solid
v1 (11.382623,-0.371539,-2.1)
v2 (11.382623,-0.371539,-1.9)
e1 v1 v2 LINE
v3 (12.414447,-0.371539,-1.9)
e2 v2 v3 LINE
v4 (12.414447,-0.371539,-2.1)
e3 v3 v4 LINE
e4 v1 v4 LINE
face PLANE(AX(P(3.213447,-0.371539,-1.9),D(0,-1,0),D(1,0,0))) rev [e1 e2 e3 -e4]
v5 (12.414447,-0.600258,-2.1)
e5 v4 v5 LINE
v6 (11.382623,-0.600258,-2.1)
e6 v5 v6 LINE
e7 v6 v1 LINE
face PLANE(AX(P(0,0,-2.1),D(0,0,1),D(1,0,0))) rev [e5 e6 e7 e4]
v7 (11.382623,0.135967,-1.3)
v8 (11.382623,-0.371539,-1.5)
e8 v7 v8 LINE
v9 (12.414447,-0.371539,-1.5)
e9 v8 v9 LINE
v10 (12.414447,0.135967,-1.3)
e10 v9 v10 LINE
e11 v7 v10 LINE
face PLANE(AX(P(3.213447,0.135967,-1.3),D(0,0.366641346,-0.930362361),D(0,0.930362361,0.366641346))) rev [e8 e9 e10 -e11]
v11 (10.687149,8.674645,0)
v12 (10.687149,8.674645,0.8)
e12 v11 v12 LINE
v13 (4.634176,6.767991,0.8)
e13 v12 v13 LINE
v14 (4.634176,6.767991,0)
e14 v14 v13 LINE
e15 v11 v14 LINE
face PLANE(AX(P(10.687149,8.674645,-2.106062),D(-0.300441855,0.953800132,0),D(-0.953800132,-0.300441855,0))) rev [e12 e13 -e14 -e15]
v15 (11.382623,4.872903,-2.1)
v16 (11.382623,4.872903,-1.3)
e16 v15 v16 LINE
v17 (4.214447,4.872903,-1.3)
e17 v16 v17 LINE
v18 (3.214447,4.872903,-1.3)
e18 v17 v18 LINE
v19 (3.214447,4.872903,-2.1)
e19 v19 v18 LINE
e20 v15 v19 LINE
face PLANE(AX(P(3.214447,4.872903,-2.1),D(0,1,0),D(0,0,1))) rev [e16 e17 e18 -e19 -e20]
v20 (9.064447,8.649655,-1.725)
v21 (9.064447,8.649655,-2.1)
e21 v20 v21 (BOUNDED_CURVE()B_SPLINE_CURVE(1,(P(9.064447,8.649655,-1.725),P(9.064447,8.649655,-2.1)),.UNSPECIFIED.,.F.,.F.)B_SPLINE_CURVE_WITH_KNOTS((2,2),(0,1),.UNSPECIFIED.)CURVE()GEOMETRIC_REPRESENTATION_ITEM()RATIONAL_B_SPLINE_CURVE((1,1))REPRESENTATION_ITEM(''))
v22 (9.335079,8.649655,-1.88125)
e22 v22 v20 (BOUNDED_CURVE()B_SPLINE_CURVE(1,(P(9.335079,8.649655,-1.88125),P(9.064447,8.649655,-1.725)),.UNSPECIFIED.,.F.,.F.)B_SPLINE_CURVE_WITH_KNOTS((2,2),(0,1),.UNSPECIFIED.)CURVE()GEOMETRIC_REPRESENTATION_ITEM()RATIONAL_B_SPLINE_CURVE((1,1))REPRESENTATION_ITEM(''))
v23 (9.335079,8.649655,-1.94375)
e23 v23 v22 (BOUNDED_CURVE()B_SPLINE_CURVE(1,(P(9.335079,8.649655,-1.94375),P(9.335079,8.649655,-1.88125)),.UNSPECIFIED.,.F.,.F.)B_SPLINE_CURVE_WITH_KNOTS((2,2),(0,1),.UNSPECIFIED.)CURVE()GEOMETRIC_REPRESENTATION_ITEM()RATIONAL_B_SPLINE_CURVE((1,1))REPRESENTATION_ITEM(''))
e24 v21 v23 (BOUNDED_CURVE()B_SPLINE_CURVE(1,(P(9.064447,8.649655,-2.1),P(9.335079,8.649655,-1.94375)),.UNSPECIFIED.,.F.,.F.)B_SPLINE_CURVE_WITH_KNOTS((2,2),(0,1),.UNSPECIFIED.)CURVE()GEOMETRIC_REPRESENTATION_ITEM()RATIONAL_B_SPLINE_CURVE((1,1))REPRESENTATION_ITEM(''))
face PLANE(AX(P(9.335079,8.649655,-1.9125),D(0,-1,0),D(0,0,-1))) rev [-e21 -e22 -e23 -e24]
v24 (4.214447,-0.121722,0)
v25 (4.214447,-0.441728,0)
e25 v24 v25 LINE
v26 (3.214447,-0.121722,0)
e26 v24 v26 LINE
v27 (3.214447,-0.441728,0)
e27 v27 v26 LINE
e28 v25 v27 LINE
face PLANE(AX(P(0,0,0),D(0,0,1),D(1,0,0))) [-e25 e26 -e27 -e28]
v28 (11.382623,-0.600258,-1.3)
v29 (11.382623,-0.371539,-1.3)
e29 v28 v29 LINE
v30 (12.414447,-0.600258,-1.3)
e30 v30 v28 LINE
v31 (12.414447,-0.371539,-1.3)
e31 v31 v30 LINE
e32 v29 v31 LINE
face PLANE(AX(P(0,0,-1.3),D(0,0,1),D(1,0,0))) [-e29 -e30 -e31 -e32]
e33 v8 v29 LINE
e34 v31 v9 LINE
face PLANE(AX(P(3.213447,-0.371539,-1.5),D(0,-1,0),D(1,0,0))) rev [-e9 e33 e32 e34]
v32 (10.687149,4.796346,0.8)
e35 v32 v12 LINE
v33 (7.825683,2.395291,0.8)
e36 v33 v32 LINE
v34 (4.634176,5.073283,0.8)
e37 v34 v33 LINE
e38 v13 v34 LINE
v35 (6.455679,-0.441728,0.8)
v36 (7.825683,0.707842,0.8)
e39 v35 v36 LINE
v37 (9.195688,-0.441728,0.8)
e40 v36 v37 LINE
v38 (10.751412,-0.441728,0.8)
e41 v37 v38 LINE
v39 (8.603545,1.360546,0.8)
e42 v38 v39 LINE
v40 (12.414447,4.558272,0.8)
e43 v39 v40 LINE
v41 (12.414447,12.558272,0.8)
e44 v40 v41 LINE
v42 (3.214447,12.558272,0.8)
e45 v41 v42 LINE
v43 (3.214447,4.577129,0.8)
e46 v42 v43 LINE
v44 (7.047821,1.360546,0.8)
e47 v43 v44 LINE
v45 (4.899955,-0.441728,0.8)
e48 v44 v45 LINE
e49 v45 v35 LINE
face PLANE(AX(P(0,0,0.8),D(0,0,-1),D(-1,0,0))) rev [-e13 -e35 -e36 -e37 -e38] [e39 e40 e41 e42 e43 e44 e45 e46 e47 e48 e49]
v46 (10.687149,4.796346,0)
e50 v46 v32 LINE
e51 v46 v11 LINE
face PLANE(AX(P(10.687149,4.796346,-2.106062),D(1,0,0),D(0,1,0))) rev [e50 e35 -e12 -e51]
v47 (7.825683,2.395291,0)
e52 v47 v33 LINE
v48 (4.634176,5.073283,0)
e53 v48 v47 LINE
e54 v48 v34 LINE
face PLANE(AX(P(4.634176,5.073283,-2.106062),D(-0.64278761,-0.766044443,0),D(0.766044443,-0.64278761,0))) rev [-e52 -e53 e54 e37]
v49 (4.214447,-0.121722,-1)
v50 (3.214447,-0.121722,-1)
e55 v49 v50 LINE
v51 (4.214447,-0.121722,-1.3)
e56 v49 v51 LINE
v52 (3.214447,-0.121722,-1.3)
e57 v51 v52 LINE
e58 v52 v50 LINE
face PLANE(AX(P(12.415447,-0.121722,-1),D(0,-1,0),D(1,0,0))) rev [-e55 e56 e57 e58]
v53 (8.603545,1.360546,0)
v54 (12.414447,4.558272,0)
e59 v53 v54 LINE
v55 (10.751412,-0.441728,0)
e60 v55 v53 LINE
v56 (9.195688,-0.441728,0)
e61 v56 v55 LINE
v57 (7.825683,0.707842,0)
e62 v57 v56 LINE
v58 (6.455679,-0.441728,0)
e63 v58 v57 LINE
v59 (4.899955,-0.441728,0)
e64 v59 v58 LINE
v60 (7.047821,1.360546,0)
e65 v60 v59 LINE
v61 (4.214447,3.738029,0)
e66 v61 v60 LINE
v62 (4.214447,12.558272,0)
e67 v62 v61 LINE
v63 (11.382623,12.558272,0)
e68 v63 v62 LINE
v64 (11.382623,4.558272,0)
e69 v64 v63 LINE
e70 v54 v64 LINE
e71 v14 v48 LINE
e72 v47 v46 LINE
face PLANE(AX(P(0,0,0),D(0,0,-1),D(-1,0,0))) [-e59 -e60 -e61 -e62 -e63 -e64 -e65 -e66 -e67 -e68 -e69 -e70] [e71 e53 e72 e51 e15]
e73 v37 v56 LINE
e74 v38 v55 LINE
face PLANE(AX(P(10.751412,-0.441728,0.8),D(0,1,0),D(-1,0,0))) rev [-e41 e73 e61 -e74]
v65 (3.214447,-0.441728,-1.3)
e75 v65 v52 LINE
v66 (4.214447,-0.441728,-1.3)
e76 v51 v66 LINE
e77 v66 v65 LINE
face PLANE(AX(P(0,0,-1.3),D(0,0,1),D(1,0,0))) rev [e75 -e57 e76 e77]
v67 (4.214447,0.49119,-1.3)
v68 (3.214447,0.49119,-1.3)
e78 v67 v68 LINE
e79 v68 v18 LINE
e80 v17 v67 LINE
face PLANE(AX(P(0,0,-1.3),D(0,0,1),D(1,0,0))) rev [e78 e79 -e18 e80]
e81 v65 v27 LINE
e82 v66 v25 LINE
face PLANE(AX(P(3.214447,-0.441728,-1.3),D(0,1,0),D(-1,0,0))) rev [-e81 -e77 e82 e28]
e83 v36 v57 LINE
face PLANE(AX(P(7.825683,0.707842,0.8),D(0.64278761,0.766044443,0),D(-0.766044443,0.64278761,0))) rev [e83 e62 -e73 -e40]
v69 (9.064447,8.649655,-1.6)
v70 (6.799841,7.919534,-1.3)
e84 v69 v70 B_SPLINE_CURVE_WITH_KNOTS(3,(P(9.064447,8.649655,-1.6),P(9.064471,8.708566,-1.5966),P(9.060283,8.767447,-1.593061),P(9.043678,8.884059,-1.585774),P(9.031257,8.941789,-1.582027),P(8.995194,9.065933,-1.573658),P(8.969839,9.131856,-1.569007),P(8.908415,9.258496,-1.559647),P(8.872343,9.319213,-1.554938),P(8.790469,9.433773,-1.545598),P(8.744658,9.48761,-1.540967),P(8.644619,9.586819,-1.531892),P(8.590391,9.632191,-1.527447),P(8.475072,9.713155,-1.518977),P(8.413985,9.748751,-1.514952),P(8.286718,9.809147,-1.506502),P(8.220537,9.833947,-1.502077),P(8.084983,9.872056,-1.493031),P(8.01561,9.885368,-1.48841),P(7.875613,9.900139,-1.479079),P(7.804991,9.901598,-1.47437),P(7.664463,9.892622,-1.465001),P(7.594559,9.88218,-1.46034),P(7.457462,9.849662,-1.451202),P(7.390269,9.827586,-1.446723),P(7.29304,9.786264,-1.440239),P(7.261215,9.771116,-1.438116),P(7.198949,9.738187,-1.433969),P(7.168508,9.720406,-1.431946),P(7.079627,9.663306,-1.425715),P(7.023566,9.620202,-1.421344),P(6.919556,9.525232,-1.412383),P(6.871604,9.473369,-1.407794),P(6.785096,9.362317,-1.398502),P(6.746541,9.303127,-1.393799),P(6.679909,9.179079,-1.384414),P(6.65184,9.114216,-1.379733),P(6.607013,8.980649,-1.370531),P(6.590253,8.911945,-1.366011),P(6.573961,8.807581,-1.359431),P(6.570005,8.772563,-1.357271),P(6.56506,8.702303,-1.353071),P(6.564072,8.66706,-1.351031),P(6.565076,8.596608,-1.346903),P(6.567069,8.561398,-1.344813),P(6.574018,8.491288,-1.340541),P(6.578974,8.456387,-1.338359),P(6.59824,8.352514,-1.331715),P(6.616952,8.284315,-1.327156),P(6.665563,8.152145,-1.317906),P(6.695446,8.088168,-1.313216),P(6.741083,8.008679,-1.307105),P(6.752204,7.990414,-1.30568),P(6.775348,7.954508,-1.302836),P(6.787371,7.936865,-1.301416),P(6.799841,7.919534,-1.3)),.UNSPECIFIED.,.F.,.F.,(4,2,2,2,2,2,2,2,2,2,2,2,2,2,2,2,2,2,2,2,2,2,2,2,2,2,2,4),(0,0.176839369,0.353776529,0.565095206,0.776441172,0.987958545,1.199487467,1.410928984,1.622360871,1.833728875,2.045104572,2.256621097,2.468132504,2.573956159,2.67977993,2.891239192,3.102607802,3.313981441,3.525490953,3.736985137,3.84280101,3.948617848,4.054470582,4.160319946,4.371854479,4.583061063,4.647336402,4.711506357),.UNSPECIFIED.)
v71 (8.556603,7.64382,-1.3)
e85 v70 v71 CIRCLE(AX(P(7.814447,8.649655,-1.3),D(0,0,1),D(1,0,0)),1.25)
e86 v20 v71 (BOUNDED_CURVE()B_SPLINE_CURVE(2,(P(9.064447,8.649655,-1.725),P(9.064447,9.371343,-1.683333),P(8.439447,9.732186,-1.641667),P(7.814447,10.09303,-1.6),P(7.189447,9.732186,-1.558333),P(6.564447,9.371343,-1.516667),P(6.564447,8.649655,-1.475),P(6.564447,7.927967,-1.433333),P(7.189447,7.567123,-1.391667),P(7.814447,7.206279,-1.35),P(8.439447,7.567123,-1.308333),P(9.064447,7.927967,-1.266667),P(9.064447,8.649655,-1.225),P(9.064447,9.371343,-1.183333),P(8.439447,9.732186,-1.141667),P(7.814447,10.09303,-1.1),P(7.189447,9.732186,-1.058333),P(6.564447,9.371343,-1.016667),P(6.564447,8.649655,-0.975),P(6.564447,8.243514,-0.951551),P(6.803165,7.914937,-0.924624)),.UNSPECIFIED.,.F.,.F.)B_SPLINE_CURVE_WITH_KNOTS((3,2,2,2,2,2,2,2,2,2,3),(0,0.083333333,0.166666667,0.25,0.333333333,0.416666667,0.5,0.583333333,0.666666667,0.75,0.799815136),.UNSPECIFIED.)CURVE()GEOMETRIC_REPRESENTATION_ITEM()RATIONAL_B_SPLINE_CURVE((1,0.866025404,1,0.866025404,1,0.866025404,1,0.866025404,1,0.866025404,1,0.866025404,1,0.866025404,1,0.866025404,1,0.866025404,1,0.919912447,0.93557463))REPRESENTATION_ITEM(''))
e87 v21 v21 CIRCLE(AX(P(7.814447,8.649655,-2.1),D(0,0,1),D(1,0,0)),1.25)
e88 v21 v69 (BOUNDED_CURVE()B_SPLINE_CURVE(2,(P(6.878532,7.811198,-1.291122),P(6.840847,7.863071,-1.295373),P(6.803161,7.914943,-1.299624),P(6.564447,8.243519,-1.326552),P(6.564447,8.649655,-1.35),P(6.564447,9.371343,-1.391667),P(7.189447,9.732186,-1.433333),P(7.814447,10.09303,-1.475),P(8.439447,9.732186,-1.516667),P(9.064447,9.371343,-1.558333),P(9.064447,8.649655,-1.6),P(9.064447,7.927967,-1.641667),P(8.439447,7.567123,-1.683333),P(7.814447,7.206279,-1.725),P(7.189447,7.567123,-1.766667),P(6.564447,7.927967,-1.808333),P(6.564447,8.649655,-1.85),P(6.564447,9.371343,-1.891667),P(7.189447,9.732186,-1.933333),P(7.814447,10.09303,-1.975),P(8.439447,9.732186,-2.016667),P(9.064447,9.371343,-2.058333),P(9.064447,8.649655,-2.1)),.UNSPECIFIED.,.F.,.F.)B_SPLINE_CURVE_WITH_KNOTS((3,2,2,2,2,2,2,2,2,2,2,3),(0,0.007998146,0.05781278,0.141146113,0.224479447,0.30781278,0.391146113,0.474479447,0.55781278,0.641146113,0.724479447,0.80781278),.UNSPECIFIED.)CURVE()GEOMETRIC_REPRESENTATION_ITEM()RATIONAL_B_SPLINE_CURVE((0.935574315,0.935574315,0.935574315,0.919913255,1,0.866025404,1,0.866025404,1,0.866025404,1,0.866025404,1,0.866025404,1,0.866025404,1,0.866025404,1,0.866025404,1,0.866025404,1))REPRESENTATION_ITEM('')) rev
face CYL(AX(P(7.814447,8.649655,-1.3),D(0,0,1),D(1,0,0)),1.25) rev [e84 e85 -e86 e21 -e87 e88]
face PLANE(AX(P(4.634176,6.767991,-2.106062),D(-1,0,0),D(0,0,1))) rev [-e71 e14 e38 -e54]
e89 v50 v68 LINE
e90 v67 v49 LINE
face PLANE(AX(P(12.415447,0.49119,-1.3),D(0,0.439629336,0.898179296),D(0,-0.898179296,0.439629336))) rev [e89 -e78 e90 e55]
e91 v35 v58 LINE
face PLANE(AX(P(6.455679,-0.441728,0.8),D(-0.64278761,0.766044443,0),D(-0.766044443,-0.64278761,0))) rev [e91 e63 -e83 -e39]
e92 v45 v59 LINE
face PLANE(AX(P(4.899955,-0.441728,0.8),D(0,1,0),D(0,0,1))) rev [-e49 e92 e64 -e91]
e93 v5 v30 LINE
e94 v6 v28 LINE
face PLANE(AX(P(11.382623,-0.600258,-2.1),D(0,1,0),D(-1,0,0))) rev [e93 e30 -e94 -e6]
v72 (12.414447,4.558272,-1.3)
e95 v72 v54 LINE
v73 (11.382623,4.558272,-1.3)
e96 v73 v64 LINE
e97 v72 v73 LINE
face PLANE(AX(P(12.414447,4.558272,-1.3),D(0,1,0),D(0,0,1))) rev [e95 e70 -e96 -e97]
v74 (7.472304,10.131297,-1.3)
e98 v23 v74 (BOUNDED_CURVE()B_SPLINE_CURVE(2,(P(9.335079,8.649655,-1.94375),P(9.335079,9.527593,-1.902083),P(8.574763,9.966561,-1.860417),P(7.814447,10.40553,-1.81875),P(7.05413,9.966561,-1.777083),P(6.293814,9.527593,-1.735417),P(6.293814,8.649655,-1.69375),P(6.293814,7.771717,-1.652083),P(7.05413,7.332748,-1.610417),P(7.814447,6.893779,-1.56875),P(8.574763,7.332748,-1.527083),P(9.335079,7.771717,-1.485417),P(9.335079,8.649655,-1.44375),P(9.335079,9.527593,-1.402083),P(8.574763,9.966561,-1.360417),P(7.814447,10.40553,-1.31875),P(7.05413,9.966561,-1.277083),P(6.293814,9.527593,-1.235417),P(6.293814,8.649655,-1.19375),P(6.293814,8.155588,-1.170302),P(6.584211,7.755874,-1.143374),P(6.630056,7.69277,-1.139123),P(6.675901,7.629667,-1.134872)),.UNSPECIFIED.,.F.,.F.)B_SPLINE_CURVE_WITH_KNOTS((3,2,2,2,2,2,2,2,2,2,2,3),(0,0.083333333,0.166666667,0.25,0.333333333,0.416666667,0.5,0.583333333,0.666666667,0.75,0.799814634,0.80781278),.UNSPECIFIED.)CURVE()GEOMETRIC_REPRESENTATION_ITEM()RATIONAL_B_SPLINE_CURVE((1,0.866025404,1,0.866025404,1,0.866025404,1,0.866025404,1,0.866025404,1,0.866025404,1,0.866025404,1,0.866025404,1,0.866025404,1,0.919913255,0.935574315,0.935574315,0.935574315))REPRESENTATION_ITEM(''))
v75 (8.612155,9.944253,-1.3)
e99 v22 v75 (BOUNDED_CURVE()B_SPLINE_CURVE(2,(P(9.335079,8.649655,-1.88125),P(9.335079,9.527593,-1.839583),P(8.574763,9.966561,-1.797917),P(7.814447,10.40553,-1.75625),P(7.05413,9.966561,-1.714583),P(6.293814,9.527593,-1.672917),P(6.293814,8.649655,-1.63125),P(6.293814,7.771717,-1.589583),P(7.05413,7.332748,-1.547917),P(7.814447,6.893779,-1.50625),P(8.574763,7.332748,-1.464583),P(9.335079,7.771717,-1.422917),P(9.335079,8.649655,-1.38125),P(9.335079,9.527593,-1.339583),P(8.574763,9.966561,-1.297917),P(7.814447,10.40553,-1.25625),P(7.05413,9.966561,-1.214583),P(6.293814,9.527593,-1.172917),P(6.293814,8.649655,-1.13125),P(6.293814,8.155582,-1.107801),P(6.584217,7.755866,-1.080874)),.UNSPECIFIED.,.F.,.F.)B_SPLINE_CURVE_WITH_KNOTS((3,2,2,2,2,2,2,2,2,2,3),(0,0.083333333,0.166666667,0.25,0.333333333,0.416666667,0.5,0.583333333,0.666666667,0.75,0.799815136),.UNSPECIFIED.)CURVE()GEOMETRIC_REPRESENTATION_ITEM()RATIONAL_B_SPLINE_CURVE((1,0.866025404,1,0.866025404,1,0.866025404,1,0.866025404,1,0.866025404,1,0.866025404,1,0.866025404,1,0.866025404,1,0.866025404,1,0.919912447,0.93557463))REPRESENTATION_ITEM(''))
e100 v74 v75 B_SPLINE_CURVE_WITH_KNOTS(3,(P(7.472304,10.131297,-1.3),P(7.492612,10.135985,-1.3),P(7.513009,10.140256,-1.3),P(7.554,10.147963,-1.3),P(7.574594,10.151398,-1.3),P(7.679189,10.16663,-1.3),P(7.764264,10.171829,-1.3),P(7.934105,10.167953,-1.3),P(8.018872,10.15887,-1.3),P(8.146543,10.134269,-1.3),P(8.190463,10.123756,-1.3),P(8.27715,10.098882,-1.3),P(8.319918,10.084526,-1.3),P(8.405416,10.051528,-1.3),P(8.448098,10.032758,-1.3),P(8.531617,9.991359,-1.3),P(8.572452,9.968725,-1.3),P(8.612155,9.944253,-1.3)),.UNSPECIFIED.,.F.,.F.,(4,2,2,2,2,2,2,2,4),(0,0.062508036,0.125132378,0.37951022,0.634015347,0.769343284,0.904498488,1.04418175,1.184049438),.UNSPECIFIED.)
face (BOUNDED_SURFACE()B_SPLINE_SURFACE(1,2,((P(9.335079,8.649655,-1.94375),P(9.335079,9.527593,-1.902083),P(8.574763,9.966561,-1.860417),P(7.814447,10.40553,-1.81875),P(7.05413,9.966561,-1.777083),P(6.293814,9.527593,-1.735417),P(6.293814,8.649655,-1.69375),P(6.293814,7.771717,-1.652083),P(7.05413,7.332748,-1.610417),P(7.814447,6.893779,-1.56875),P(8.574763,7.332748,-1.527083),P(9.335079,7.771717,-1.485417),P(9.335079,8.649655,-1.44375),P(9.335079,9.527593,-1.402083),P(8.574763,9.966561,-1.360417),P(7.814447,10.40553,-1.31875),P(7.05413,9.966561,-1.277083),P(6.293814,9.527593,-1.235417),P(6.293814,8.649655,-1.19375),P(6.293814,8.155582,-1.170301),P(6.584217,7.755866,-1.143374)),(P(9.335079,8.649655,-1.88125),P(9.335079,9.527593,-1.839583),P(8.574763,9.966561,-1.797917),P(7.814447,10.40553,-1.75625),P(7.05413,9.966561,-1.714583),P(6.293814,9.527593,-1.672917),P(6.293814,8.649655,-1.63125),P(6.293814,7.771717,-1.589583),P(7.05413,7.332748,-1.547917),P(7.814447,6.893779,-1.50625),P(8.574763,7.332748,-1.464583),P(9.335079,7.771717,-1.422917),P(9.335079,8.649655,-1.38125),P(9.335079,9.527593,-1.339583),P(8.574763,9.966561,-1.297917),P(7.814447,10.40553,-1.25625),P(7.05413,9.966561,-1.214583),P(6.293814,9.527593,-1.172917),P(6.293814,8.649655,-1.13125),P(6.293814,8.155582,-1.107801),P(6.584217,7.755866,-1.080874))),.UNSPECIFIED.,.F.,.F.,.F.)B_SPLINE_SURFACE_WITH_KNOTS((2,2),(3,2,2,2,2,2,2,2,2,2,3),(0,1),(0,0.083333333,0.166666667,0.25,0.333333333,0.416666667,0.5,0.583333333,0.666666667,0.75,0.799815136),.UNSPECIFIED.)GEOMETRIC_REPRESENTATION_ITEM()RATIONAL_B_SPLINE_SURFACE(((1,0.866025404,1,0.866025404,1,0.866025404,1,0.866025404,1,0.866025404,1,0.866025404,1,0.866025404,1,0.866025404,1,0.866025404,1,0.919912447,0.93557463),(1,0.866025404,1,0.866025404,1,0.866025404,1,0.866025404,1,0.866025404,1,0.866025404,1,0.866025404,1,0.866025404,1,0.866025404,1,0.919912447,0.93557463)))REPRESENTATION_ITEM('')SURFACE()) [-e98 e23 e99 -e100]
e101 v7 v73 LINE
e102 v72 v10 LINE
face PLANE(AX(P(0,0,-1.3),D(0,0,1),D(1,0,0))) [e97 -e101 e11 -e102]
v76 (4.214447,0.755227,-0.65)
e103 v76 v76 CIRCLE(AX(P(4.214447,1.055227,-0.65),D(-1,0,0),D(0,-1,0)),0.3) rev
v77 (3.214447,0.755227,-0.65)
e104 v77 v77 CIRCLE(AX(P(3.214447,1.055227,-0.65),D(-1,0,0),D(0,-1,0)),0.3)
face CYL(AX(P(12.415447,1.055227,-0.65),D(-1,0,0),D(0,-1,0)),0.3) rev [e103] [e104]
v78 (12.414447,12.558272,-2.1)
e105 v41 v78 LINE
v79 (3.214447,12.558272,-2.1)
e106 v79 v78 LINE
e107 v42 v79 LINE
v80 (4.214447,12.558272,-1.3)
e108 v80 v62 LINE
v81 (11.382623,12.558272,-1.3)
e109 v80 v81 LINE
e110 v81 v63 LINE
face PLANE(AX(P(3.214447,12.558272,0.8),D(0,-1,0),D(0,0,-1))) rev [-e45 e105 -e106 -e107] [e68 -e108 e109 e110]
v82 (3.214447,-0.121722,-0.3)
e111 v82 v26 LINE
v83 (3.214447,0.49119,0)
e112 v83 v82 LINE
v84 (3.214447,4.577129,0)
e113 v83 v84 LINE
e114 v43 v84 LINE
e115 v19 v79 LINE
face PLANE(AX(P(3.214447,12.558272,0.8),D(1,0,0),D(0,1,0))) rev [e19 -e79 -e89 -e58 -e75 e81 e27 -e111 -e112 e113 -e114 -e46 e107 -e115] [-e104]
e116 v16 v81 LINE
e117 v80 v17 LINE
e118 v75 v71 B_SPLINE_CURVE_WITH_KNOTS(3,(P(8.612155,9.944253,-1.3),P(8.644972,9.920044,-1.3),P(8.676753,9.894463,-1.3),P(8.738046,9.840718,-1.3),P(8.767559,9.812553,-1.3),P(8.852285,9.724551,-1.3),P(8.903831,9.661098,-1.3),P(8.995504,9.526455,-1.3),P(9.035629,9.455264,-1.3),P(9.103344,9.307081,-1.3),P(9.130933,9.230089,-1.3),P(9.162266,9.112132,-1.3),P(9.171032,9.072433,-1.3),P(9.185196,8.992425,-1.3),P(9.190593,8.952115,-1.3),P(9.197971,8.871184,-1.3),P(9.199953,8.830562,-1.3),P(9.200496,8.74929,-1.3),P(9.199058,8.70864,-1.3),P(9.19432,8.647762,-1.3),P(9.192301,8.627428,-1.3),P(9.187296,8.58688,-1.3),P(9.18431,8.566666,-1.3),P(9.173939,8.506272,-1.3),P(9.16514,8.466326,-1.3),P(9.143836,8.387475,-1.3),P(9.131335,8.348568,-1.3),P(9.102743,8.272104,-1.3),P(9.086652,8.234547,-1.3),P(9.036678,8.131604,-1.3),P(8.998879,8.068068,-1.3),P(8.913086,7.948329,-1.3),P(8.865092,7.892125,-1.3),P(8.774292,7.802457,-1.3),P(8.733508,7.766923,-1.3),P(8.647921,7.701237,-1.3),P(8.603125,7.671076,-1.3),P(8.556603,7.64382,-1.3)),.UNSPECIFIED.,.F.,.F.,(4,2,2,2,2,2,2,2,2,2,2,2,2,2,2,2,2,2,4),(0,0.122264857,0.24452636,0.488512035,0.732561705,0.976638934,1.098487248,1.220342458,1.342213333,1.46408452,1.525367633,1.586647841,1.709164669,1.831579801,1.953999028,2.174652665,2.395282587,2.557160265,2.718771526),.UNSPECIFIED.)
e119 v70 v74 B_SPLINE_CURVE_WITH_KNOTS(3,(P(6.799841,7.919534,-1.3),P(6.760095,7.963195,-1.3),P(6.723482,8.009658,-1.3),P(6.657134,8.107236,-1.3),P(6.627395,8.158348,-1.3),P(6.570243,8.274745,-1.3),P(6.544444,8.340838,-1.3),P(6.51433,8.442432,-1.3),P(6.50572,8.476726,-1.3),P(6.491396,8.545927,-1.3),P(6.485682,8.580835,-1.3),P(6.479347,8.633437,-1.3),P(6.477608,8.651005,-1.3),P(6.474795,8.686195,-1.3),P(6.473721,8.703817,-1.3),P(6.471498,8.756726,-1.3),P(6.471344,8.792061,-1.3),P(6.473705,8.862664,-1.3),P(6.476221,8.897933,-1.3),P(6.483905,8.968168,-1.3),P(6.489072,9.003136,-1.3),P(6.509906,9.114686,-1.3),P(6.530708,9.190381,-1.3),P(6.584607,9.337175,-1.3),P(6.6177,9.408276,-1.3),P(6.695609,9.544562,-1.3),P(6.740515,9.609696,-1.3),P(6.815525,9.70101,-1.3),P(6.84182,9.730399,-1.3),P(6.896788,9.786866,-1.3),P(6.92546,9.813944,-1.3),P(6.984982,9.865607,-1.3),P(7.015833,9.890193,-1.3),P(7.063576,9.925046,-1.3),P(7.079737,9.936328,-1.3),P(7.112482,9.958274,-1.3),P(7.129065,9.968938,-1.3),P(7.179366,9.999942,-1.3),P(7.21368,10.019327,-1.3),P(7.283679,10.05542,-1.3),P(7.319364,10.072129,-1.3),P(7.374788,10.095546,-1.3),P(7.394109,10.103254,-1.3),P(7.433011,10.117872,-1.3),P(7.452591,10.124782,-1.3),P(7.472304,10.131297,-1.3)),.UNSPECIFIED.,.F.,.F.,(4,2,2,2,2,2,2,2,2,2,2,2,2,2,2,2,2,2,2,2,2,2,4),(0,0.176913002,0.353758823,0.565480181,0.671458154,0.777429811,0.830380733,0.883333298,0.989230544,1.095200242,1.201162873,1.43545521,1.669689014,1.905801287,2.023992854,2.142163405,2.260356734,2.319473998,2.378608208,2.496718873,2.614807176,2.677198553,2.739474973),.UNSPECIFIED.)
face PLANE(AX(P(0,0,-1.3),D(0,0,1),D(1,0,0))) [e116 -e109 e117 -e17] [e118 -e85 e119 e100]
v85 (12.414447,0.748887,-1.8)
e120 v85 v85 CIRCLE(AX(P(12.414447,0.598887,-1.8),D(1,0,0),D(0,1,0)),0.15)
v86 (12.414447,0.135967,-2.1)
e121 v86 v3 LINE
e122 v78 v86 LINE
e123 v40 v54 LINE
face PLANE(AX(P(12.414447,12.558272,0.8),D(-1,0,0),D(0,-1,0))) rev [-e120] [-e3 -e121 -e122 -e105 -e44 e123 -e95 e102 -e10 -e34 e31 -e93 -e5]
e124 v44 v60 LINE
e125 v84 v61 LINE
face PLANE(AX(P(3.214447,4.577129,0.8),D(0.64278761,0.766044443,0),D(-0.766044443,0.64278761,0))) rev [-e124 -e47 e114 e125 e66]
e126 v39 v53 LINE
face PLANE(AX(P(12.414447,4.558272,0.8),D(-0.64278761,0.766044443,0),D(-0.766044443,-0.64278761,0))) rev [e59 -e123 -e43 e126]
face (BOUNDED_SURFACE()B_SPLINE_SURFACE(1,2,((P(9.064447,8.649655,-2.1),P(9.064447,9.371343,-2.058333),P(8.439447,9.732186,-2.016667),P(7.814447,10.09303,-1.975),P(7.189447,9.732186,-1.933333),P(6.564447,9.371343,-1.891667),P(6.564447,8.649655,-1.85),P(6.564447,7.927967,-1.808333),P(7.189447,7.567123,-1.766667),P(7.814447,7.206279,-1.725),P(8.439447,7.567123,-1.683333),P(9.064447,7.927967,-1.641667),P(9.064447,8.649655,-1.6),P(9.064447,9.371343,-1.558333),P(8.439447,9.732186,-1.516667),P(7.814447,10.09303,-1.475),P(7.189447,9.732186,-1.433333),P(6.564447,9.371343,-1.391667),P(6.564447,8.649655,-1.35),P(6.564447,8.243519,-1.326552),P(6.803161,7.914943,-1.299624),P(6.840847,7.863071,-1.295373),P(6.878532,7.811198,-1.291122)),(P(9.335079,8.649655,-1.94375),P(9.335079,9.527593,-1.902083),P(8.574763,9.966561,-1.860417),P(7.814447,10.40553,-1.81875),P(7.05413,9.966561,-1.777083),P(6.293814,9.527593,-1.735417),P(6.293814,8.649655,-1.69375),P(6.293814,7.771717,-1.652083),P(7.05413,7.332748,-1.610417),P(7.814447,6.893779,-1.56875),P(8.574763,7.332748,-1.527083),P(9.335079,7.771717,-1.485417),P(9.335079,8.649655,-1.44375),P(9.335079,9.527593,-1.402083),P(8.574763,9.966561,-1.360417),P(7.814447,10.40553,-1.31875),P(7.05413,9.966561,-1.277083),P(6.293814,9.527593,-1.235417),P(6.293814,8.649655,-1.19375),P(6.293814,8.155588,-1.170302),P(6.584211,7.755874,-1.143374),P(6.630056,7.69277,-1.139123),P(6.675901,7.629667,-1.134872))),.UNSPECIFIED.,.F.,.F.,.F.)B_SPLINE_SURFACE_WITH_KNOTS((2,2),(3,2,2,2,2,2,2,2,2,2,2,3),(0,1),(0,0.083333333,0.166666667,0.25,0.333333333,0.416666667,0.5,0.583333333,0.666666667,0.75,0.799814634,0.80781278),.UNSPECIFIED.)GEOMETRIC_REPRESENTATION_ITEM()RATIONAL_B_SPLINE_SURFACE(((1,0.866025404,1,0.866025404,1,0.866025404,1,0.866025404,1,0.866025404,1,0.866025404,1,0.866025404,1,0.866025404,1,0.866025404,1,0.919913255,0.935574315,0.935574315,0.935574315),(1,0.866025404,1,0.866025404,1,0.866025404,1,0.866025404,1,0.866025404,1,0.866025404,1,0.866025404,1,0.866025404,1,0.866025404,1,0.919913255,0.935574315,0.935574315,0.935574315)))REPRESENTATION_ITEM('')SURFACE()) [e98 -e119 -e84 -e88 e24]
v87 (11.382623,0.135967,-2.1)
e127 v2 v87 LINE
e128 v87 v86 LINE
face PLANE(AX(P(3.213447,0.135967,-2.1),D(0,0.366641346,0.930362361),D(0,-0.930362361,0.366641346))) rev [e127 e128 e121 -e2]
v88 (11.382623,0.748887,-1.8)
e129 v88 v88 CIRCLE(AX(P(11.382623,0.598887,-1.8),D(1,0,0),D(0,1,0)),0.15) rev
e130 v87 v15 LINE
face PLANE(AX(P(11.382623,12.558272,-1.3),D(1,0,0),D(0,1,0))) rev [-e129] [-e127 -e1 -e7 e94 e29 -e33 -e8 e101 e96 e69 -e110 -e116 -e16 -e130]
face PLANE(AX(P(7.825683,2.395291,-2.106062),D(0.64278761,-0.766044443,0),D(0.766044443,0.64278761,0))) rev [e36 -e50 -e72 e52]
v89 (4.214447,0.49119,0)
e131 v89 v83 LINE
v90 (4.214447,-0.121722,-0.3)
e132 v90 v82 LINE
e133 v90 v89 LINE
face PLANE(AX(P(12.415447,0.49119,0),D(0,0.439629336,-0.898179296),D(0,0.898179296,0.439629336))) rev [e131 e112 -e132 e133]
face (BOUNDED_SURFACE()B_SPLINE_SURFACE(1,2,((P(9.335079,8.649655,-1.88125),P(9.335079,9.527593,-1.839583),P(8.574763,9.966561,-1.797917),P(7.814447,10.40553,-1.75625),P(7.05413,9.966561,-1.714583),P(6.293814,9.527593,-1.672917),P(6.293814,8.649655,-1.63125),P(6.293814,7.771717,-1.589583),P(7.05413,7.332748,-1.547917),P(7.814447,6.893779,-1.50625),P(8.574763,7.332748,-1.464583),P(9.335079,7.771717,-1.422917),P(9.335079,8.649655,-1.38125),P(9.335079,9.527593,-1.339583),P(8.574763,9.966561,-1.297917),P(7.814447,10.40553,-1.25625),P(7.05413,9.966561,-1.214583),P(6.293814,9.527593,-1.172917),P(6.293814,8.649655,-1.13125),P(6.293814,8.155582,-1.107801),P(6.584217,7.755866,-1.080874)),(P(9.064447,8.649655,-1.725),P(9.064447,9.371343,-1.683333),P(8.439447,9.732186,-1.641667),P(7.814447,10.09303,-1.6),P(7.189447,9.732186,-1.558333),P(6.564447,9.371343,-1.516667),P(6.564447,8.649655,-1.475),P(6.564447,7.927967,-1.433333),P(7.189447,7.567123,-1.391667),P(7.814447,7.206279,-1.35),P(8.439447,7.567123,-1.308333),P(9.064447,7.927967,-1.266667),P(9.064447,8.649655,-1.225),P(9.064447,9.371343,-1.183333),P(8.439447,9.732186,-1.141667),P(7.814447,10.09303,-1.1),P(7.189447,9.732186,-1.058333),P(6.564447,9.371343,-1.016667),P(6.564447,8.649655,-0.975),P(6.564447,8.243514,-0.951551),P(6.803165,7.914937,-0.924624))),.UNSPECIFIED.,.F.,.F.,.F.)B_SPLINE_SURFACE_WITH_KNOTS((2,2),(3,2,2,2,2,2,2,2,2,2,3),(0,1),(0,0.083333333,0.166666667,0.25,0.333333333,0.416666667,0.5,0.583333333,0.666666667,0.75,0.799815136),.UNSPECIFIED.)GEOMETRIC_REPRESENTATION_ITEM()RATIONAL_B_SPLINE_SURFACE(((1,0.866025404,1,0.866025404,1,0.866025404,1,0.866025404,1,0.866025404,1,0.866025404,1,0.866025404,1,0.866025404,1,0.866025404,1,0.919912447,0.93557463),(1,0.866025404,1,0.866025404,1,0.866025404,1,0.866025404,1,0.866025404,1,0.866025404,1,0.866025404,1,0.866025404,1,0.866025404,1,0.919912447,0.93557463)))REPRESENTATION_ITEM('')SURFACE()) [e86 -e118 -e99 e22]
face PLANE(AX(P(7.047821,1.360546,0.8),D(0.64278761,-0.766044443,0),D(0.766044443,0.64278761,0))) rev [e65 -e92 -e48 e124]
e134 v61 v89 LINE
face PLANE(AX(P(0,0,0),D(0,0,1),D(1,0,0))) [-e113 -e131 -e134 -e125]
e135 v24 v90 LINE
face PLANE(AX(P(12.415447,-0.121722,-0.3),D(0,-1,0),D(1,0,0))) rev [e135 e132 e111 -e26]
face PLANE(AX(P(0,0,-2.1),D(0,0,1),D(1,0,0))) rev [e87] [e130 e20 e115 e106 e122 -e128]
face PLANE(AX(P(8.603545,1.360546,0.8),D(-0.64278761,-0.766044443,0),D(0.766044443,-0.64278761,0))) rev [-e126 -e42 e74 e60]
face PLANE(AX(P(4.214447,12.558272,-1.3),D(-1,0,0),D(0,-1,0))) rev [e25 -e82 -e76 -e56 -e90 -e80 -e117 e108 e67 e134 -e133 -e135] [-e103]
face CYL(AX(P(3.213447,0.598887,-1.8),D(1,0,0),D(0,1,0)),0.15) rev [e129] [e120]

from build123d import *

# Parameters (mm, degrees)
BOSS_EXTRUDE1_DEPTH   = 0.8
SKETCH5_W             = 1
SKETCH5_H             = 13
SKETCH5_W_2           = 1.031823626
SKETCH5_H_2           = 8
BOSS_EXTRUDE2_DEPTH   = 1.3
BOSS_EXTRUDE3_DEPTH   = 0.8
M3_TAPPED_HOLE1_D     = 2.5
M3_TAPPED_HOLE1_DEPTH = 0.8
THREAD2_PITCH         = 0.5
CUT_EXTRUDE1_REACH    = 17.709
SKETCH12_R            = 0.3
CUT_EXTRUDE2_REACH    = 19.895
CUT_EXTRUDE3_REACH    = 17.709
SKETCH14_R            = 0.15


with BuildPart() as part:
    # Sketch1 → Boss-Extrude1 (new body)
    with BuildSketch(Plane.XY):
        Polygon((3.214446547, 12.558271664), (12.414446547, 12.558271664), (12.414446547, 4.558271664), (8.603545102, 1.360545667), (10.75141162, -0.441728336), (9.195687793, -0.441728336), (7.825683188, 0.707842022), (6.455678584, -0.441728336), (4.899954757, -0.441728336), (7.047821275, 1.360545667), (3.214446547, 4.577128987), align=None)
    extrude(amount=BOSS_EXTRUDE1_DEPTH)

    # Sketch5 → Boss-Extrude2 (add)
    with BuildSketch(Plane(origin=(0, 0, 0), x_dir=(-1, 0, 0), z_dir=(0, 0, -1))):
        with Locations((-3.714446547, 6.058271664)):
            Rectangle(SKETCH5_W, SKETCH5_H)
        with Locations((-11.898534734, 8.558271664)):
            Rectangle(SKETCH5_W_2, SKETCH5_H_2)
    extrude(amount=BOSS_EXTRUDE2_DEPTH)

    # Sketch8 → Boss-Extrude3 (add)
    with BuildSketch(Plane(origin=(0, 0, -1.3), x_dir=(-1, 0, 0), z_dir=(0, 0, -1))):
        Polygon((-12.414446547, 12.558271664), (-3.214446547, 12.558271664), (-3.214446547, 4.872903055), (-11.382622921, 4.872903055), (-11.382622921, -0.60025791), (-12.414446547, -0.60025791), align=None)
    extrude(amount=BOSS_EXTRUDE3_DEPTH)

    # M3 Tapped Hole1
    with Locations(Plane(origin=(0, 0, -1.3), x_dir=(-1, 0, 0), z_dir=(0, 0, 1))):
        with Locations((-7.814446547, -8.649654686)):
            Hole(M3_TAPPED_HOLE1_D / 2, depth=M3_TAPPED_HOLE1_DEPTH)

    # Thread2: the profile of Thread Profile4 profile screwed along a right-hand helix of 1.6 turns, 6 arcs to a turn; built about Z, then put on its axis
    thread2_z = Axis((0, 0, 0), (0, 0, 1))
    thread2_corners = [(1.2497, 0, -0.000173205), (1.520632937, 0, 0.156249999), (1.520632937, 0, 0.218749999), (1.2497, 0, 0.375173204)]
    with BuildLine(mode=Mode.PRIVATE) as thread2_profile:
        Line(thread2_corners[0], thread2_corners[1])
        Line(thread2_corners[1], thread2_corners[2])
        Line(thread2_corners[2], thread2_corners[3])
        Line(thread2_corners[3], thread2_corners[0])
    thread2_cap = Face(thread2_profile.wire())
    thread2_turn_angles = [0, 30, 60, 90, 120, 150, 180, 210, 240, 270, 300, 330, 360]
    thread2_turn_weights = [1, 0.8660254037844387, 1, 0.8660254037844387, 1, 0.8660254037844387, 1, 0.8660254037844387, 1, 0.8660254037844387, 1, 0.8660254037844387, 1]
    thread2_turn_rails = [Edge.make_bspline([Vector(p[0], p[1], 0).rotate(thread2_z, thread2_turn_angles[k]) / thread2_turn_weights[k] + Vector(0, 0, p[2] + THREAD2_PITCH * thread2_turn_angles[k] / 360) for k in range(13)], [0, 0, 0, 1, 1, 2, 2, 3, 3, 4, 4, 5, 5, 6, 6, 6], 2, thread2_turn_weights) for p in thread2_corners]
    thread2_turn_sides = [Face.make_surface_from_curves(thread2_turn_rails[p[0]], thread2_turn_rails[p[1]]) for p in [(0, 1), (1, 2), (2, 3), (3, 0)]]
    thread2_last_angles = [360, 390, 420, 450, 480, 510, 540, 558, 576]
    thread2_last_weights = [1, 0.8660254037844387, 1, 0.8660254037844387, 1, 0.8660254037844387, 1, 0.9510565162951535, 1]
    thread2_last_rails = [Edge.make_bspline([Vector(p[0], p[1], 0).rotate(thread2_z, thread2_last_angles[k]) / thread2_last_weights[k] + Vector(0, 0, p[2] + THREAD2_PITCH * thread2_last_angles[k] / 360) for k in range(9)], [0, 0, 0, 1, 1, 2, 2, 3, 3, 4, 4, 4], 2, thread2_last_weights) for p in thread2_corners]
    thread2_last_sides = [Face.make_surface_from_curves(thread2_last_rails[p[0]], thread2_last_rails[p[1]]) for p in [(0, 1), (1, 2), (2, 3), (3, 0)]]
    thread2 = Plane(origin=(7.814446547, 8.649654686, -2.1), x_dir=(1, 0, 0), z_dir=(0, 0, 1)) * Solid(Shell([*thread2_turn_sides, *thread2_last_sides, thread2_cap, thread2_cap.rotate(thread2_z, 576).moved(Location((0, 0, THREAD2_PITCH * 576 / 360)))]))
    add(thread2, mode=Mode.SUBTRACT)

    # Sketch12 → Cut-Extrude1 (cut, up to next)
    with BuildSketch(Plane.ZY.offset(-3.214446547), mode=Mode.PRIVATE) as cut_extrude1_sk1:
        with Locations(Location((-0.65, 1.055227185, 0), (0, 0, 270))):
            Circle(SKETCH12_R)
    cut_extrude1_tool1 = extrude(cut_extrude1_sk1.sketch, amount=-CUT_EXTRUDE1_REACH, mode=Mode.PRIVATE) & part.part
    # Sketch12 → Cut-Extrude1 (cut, up to next)
    with BuildSketch(Plane.ZY.offset(-3.214446547), mode=Mode.PRIVATE) as cut_extrude1_sk2:
        Polygon((-1.3, 0.491189657), (-1, -0.121721645), (-1.3, -0.121721645), align=None)
    cut_extrude1_tool2 = extrude(cut_extrude1_sk2.sketch, amount=-CUT_EXTRUDE1_REACH, mode=Mode.PRIVATE) & part.part
    # Sketch12 → Cut-Extrude1 (cut, up to next)
    with BuildSketch(Plane.ZY.offset(-3.214446547), mode=Mode.PRIVATE) as cut_extrude1_sk3:
        Polygon((0, 0.491189657), (-0.3, -0.121721645), (0, -0.121721645), align=None)
    cut_extrude1_tool3 = extrude(cut_extrude1_sk3.sketch, amount=-CUT_EXTRUDE1_REACH, mode=Mode.PRIVATE) & part.part
    add(cut_extrude1_tool1.solids().sort_by_distance((3.214447, 1.055227, -0.65))[0], mode=Mode.SUBTRACT)
    add(cut_extrude1_tool2.solids().sort_by_distance((3.214447, 0.082582, -1.2))[0], mode=Mode.SUBTRACT)
    add(cut_extrude1_tool3.solids().sort_by_distance((3.214447, 0.082582, -0.1))[0], mode=Mode.SUBTRACT)

    # Sketch13 → Cut-Extrude2 (cut, up to next)
    with BuildSketch(Plane.XY.offset(0.8), mode=Mode.PRIVATE) as cut_extrude2_sk1:
        Polygon((4.634176401, 6.767991384), (4.634176401, 5.073282991), (7.825683188, 2.395290823), (10.687148853, 4.796345607), (10.687148853, 8.674644795), align=None)
    cut_extrude2_tool1 = extrude(cut_extrude2_sk1.sketch, amount=-CUT_EXTRUDE2_REACH, mode=Mode.PRIVATE) & part.part
    add(cut_extrude2_tool1.solids().sort_by_distance((7.949639, 5.66496, 0.8))[0], mode=Mode.SUBTRACT)

    # Sketch14 → Cut-Extrude3 (cut, up to next)
    with BuildSketch(Plane(origin=(12.414446547, 0, 0), x_dir=(0, 0, -1), z_dir=(1, 0, 0)), mode=Mode.PRIVATE) as cut_extrude3_sk1:
        with Locations(Location((1.8, 0.598886989, 0), (0, 0, 90))):
            Circle(SKETCH14_R)
    cut_extrude3_tool1 = extrude(cut_extrude3_sk1.sketch, amount=-CUT_EXTRUDE3_REACH, mode=Mode.PRIVATE) & part.part
    # Sketch14 → Cut-Extrude3 (cut, up to next)
    with BuildSketch(Plane(origin=(12.414446547, 0, 0), x_dir=(0, 0, -1), z_dir=(1, 0, 0)), mode=Mode.PRIVATE) as cut_extrude3_sk2:
        Polygon((1.3, 0.13596653), (1.5, -0.371538896), (1.3, -0.371538896), align=None)
    cut_extrude3_tool2 = extrude(cut_extrude3_sk2.sketch, amount=-CUT_EXTRUDE3_REACH, mode=Mode.PRIVATE) & part.part
    # Sketch14 → Cut-Extrude3 (cut, up to next)
    with BuildSketch(Plane(origin=(12.414446547, 0, 0), x_dir=(0, 0, -1), z_dir=(1, 0, 0)), mode=Mode.PRIVATE) as cut_extrude3_sk3:
        Polygon((2.1, 0.13596653), (1.9, -0.371538896), (2.1, -0.371538896), align=None)
    cut_extrude3_tool3 = extrude(cut_extrude3_sk3.sketch, amount=-CUT_EXTRUDE3_REACH, mode=Mode.PRIVATE) & part.part
    add(cut_extrude3_tool1.solids().sort_by_distance((12.414447, 0.598887, -1.8))[0], mode=Mode.SUBTRACT)
    add(cut_extrude3_tool2.solids().sort_by_distance((12.414447, -0.20237, -1.366667))[0], mode=Mode.SUBTRACT)
    add(cut_extrude3_tool3.solids().sort_by_distance((12.414447, -0.20237, -2.033333))[0], mode=Mode.SUBTRACT)


solid = part.part
